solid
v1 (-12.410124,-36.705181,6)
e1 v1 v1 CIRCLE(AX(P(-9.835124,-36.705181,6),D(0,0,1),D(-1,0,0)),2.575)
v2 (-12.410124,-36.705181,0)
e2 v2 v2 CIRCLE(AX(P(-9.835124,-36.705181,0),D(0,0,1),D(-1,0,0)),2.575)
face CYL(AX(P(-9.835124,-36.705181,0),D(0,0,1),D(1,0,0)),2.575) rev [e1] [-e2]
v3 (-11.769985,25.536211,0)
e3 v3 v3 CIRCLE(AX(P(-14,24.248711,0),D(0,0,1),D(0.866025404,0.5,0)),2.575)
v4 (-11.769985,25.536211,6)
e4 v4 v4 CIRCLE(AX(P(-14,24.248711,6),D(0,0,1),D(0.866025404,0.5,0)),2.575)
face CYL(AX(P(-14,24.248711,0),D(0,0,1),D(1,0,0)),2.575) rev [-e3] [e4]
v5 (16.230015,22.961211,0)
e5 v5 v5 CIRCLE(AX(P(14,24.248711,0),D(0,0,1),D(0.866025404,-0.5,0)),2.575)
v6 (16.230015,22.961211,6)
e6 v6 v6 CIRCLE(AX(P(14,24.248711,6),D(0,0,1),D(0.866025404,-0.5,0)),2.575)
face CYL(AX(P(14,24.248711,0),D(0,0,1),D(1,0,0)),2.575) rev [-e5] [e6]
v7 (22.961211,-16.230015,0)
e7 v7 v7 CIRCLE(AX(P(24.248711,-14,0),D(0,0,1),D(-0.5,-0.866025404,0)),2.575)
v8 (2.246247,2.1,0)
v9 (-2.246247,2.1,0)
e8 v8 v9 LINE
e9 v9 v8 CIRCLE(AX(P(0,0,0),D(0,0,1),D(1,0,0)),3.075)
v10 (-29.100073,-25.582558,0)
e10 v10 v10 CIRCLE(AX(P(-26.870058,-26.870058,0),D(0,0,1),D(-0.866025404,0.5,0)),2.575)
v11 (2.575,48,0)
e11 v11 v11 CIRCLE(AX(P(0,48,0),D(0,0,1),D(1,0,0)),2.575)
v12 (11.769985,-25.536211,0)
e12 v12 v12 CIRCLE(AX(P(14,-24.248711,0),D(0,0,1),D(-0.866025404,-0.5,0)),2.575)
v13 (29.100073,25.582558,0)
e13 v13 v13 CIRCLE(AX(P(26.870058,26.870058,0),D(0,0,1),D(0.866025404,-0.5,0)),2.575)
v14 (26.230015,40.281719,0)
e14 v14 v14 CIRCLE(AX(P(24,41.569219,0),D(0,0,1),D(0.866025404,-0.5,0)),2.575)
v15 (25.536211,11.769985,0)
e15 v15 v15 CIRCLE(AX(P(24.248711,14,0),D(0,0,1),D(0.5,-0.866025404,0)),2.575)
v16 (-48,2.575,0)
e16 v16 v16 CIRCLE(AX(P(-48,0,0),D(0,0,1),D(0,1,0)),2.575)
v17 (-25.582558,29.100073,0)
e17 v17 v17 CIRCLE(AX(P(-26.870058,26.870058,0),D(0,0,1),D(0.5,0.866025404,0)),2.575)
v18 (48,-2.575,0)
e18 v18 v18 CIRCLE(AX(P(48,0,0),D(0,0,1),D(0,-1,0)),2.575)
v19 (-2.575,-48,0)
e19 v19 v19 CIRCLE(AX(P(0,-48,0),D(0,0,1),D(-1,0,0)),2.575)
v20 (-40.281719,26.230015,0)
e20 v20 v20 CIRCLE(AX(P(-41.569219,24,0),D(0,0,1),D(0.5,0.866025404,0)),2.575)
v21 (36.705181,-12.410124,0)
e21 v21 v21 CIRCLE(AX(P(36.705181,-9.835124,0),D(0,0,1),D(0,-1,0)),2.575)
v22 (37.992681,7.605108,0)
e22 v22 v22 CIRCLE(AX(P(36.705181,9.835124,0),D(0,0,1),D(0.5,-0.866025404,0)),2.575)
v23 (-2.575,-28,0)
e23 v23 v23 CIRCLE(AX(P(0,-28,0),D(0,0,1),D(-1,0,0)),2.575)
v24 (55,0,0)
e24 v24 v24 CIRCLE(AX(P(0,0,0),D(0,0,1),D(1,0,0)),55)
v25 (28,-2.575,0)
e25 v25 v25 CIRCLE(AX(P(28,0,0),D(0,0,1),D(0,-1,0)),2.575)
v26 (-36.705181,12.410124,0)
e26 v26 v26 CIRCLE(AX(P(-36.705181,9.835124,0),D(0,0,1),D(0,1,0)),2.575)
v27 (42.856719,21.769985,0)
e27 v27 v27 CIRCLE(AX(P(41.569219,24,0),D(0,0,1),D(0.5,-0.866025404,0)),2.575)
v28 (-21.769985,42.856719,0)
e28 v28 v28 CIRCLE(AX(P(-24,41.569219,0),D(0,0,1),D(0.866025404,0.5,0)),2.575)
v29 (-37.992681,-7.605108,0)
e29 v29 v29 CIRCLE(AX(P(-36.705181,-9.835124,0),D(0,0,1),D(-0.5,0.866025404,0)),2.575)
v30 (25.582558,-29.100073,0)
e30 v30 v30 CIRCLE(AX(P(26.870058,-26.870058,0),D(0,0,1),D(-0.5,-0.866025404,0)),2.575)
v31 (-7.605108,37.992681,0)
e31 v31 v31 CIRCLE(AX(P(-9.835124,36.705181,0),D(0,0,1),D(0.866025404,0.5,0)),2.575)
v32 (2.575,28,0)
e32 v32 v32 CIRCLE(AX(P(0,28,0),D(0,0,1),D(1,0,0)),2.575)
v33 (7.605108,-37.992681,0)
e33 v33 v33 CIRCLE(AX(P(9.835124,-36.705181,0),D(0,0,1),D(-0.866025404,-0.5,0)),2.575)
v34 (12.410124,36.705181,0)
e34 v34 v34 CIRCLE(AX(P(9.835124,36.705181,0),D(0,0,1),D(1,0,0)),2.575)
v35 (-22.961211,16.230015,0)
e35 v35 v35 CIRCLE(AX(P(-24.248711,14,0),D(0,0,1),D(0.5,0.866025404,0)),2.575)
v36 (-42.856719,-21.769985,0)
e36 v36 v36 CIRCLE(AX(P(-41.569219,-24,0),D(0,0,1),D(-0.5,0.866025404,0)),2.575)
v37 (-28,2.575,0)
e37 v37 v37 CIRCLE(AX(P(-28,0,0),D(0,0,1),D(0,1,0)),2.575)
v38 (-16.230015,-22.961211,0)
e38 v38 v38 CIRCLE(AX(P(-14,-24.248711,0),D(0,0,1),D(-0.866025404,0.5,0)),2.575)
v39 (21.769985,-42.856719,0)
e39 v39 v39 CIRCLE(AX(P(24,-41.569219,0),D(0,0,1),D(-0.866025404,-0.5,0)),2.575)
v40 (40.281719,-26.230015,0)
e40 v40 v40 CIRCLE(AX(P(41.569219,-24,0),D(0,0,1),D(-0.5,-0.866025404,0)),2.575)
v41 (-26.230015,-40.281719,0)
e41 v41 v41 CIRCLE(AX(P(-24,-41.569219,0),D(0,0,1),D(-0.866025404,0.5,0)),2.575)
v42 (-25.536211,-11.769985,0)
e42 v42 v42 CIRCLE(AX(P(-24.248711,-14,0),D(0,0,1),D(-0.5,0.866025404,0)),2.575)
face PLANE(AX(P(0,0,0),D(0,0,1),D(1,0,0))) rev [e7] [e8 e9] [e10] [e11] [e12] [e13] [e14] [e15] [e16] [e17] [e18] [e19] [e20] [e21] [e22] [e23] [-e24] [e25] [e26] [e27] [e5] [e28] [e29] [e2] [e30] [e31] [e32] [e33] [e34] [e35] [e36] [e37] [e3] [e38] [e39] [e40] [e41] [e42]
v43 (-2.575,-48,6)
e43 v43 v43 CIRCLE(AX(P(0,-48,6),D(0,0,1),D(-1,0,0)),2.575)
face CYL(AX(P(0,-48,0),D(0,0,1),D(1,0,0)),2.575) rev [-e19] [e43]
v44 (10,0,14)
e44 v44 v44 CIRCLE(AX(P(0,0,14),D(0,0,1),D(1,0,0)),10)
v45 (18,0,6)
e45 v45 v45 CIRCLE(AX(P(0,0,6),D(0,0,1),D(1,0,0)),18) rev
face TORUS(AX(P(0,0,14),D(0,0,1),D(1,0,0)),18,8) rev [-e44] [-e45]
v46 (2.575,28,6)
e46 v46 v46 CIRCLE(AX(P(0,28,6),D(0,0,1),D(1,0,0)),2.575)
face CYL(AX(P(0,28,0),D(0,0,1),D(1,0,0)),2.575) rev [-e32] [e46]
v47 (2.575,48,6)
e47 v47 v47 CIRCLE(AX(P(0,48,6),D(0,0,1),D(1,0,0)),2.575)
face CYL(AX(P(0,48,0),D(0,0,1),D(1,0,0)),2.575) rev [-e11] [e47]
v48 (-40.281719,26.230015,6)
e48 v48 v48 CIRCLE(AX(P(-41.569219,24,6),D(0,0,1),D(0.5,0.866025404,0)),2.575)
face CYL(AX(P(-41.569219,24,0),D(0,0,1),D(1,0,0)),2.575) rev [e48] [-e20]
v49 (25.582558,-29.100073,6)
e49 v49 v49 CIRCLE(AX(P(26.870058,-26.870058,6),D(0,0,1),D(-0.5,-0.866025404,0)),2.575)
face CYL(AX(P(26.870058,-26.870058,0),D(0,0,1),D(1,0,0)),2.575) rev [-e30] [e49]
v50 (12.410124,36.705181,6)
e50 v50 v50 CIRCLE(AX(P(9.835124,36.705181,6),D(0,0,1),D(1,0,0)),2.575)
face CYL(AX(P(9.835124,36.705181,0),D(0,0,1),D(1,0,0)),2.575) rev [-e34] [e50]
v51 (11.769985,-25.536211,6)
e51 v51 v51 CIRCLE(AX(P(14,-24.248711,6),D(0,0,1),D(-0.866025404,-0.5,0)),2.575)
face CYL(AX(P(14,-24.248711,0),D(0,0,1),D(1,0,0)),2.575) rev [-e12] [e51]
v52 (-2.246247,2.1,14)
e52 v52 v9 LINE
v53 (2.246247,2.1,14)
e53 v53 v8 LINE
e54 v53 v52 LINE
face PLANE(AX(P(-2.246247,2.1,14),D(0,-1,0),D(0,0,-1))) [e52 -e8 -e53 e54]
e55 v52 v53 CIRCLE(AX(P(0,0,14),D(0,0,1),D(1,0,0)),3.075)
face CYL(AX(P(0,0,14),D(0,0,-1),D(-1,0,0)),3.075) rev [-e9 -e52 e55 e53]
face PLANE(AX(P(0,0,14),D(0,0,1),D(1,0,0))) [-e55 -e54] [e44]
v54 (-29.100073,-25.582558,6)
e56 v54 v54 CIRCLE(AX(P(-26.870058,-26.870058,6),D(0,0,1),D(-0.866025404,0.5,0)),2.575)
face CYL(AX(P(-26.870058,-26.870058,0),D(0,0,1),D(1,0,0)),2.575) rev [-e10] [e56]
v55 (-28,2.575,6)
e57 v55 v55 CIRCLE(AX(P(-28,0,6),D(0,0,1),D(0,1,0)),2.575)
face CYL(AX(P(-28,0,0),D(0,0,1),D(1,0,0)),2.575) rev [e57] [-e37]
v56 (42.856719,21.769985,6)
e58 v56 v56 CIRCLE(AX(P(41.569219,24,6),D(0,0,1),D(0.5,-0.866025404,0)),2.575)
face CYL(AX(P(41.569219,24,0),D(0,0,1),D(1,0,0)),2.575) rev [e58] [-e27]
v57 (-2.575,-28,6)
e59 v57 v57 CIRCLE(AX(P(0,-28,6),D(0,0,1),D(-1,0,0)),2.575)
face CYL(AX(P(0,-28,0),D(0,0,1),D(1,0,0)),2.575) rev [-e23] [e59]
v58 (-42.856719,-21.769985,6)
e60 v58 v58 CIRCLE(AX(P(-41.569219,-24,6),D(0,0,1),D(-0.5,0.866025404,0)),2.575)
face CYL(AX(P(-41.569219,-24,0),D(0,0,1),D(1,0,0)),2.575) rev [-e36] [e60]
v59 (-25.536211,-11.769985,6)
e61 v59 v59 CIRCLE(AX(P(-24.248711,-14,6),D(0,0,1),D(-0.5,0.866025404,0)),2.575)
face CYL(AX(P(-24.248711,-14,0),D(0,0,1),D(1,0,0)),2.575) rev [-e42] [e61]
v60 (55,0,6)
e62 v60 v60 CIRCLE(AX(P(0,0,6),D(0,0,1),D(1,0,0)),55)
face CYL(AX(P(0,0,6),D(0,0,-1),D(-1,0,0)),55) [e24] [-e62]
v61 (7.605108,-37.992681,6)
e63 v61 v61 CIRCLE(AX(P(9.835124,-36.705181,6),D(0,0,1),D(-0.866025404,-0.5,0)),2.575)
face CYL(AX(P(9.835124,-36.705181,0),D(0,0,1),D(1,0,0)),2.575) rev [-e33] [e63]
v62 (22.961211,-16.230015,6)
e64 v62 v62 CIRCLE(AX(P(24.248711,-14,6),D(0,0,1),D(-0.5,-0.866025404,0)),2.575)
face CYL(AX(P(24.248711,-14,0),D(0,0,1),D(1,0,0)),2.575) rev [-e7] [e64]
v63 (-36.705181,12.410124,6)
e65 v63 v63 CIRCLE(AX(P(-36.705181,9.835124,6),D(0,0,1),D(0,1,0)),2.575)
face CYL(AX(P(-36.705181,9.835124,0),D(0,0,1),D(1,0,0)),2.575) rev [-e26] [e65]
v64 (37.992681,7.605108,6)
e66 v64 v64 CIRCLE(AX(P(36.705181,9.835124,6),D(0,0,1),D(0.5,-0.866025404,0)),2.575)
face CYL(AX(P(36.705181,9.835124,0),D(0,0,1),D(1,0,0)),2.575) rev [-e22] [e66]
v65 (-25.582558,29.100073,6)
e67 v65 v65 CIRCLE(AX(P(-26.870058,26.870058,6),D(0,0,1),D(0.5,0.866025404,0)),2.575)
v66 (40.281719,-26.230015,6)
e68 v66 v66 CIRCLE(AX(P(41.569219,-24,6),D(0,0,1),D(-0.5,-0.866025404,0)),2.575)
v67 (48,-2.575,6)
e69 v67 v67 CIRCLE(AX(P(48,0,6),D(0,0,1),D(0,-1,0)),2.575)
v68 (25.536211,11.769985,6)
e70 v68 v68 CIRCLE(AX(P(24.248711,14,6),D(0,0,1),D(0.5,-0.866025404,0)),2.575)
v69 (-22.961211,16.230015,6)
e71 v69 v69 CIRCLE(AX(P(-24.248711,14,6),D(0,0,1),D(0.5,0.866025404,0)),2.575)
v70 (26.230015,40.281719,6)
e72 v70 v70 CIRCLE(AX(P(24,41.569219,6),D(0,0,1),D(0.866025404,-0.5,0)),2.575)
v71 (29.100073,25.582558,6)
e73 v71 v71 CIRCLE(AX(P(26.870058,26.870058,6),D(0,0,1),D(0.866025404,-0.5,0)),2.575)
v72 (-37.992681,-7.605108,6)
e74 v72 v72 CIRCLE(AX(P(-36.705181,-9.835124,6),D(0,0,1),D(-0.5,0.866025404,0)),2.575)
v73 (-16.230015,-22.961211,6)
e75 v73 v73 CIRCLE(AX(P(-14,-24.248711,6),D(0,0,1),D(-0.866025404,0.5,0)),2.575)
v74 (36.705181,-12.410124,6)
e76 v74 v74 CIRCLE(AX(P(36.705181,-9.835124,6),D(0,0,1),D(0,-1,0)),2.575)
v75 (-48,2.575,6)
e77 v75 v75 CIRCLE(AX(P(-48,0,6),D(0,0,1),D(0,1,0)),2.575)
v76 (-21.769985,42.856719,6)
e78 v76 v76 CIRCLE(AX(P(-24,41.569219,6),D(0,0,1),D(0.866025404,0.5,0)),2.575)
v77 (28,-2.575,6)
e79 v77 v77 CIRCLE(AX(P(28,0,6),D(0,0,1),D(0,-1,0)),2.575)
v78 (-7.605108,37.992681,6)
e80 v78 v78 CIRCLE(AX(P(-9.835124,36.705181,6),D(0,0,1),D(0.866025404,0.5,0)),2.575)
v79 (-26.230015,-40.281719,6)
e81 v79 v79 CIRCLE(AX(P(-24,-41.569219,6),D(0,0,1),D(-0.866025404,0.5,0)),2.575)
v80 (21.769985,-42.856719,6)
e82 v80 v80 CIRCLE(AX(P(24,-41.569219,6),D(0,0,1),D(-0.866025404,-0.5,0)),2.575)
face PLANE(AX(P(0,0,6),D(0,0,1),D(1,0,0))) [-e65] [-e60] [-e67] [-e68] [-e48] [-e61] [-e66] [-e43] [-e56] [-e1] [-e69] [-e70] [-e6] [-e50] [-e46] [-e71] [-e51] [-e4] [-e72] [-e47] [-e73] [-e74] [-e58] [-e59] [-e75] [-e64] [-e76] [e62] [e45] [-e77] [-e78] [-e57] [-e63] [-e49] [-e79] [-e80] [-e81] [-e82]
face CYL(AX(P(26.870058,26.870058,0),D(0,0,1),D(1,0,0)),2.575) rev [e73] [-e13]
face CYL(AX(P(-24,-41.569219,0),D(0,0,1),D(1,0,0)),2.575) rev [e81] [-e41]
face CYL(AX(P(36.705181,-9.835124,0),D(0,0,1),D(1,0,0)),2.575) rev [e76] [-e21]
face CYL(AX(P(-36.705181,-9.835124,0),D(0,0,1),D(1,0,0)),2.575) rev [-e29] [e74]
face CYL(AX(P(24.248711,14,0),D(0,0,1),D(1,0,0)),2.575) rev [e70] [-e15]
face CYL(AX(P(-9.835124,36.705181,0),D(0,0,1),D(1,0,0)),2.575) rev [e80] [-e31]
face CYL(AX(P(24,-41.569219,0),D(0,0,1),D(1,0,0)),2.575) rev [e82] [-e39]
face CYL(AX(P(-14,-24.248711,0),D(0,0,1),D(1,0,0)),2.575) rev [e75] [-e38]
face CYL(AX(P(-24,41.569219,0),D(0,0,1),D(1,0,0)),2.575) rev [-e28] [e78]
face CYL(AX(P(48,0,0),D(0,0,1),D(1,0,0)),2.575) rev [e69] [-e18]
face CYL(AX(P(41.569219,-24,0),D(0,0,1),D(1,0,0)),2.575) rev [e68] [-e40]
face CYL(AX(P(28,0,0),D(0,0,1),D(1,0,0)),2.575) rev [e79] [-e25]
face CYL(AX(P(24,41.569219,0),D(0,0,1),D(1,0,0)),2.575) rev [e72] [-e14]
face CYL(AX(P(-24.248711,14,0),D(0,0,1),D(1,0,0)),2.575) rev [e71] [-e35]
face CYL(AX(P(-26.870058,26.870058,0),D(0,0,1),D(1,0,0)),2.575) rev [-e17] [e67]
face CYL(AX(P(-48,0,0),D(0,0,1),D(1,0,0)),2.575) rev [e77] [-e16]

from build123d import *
from build123d.topology import SkipClean

# Parameters (mm, degrees)
ESBO_O1_R                = 55
RESSALTO_EXTRUS_O1_DEPTH = 6
ESBO_O2_R                = 10
RESSALTO_EXTRUS_O2_DEPTH = 8
FILETE3_R                = 8
ESBO_O3_R                = 2.575
CORTE_EXTRUS_O1_DEPTH    = 79.192071209
PADR_OCIRCULAR1_COUNT    = 12
CORTE_EXTRUS_O2_DEPTH    = 79.192071209
ESBO_O5_R                = 2.575
CORTE_EXTRUS_O3_DEPTH    = 79.192071209
PADR_OCIRCULAR2_COUNT    = 12
ESBO_O6_R                = 2.575
CORTE_EXTRUS_O4_DEPTH    = 79.192071209
PADR_OCIRCULAR3_COUNT    = 12


with BuildPart() as part:
    # Esboço1 → Ressalto-extrusão1 (new body)
    with BuildSketch(Plane.XY):
        Circle(ESBO_O1_R)
    extrude(amount=RESSALTO_EXTRUS_O1_DEPTH)

    # Esboço2 → Ressalto-extrusão2 (add)
    with BuildSketch(Plane.XY.offset(6)):
        Circle(ESBO_O2_R)
        with BuildLine():
            Line((-2.24624687, 2.1), (2.24624687, 2.1))
            ThreePointArc((2.24624687, 2.1), (0, -3.075), (-2.24624687, 2.1))
        make_face(mode=Mode.SUBTRACT)
    extrude(amount=RESSALTO_EXTRUS_O2_DEPTH)

    # Filete3
    filete3_edges = [part.edges().sort_by_distance(p)[0] for p in [
        (-10, 0, 6),
    ]]
    fillet(filete3_edges, radius=FILETE3_R - 0.0001)  # a hair under: the kernel refuses the full size

    # Esboço3 → Corte-extrusão1 (cut, through all)
    with BuildSketch(Plane.XY.offset(6)):
        with Locations((0, 48)):
            Circle(ESBO_O3_R)
    corte_extrus_o1 = extrude(amount=-CORTE_EXTRUS_O1_DEPTH, mode=Mode.SUBTRACT)

    # PadrãoCircular1: Corte-extrusão1 ×12 about axis
    padr_ocircular1_axis = Axis((0, 0, 0), (0, 0, 1))
    for i in range(1, PADR_OCIRCULAR1_COUNT):
        add(corte_extrus_o1.rotate(padr_ocircular1_axis, i * 360 / PADR_OCIRCULAR1_COUNT), mode=Mode.SUBTRACT)

    # Esboço4 → Corte-extrusão2 (cut, through all)
    with SkipClean():  # the faces are left unmerged after this step: merging them gives an invalid solid
        with BuildSketch(Plane.XY.offset(6)):
            with BuildLine():
                Line((2.24624687, 2.1), (-2.24624687, 2.1))
                ThreePointArc((-2.24624687, 2.1), (0, -3.075), (2.24624687, 2.1))
            make_face()
        extrude(amount=-CORTE_EXTRUS_O2_DEPTH, mode=Mode.SUBTRACT)

    # Esboço5 → Corte-extrusão3 (cut, through all)
    with SkipClean():  # the faces are left unmerged after this step: merging them gives an invalid solid
        with BuildSketch(Plane.XY.offset(6)):
            with Locations((9.835123714, 36.705181399)):
                Circle(ESBO_O5_R)
        corte_extrus_o3 = extrude(amount=-CORTE_EXTRUS_O3_DEPTH, mode=Mode.SUBTRACT)

    # PadrãoCircular2: Corte-extrusão3 ×12 about axis
    with SkipClean():  # the faces are left unmerged after this step: merging them gives an invalid solid
        padr_ocircular2_axis = Axis((0, 0, 0), (0, 0, 1))
        for i in range(1, PADR_OCIRCULAR2_COUNT):
            add(corte_extrus_o3.rotate(padr_ocircular2_axis, i * 360 / PADR_OCIRCULAR2_COUNT), mode=Mode.SUBTRACT)

    # Esboço6 → Corte-extrusão4 (cut, through all)
    with SkipClean():  # the faces are left unmerged after this step: merging them gives an invalid solid
        with BuildSketch(Plane.XY.offset(6)):
            with Locations((0, 28)):
                Circle(ESBO_O6_R)
        corte_extrus_o4 = extrude(amount=-CORTE_EXTRUS_O4_DEPTH, mode=Mode.SUBTRACT)

    # PadrãoCircular3: Corte-extrusão4 ×12 about axis
    with SkipClean():  # the faces are left unmerged after this step: merging them gives an invalid solid
        padr_ocircular3_axis = Axis((0, 0, 0), (0, 0, 1))
        for i in range(1, PADR_OCIRCULAR3_COUNT):
            add(corte_extrus_o4.rotate(padr_ocircular3_axis, i * 360 / PADR_OCIRCULAR3_COUNT), mode=Mode.SUBTRACT)


solid = part.part
